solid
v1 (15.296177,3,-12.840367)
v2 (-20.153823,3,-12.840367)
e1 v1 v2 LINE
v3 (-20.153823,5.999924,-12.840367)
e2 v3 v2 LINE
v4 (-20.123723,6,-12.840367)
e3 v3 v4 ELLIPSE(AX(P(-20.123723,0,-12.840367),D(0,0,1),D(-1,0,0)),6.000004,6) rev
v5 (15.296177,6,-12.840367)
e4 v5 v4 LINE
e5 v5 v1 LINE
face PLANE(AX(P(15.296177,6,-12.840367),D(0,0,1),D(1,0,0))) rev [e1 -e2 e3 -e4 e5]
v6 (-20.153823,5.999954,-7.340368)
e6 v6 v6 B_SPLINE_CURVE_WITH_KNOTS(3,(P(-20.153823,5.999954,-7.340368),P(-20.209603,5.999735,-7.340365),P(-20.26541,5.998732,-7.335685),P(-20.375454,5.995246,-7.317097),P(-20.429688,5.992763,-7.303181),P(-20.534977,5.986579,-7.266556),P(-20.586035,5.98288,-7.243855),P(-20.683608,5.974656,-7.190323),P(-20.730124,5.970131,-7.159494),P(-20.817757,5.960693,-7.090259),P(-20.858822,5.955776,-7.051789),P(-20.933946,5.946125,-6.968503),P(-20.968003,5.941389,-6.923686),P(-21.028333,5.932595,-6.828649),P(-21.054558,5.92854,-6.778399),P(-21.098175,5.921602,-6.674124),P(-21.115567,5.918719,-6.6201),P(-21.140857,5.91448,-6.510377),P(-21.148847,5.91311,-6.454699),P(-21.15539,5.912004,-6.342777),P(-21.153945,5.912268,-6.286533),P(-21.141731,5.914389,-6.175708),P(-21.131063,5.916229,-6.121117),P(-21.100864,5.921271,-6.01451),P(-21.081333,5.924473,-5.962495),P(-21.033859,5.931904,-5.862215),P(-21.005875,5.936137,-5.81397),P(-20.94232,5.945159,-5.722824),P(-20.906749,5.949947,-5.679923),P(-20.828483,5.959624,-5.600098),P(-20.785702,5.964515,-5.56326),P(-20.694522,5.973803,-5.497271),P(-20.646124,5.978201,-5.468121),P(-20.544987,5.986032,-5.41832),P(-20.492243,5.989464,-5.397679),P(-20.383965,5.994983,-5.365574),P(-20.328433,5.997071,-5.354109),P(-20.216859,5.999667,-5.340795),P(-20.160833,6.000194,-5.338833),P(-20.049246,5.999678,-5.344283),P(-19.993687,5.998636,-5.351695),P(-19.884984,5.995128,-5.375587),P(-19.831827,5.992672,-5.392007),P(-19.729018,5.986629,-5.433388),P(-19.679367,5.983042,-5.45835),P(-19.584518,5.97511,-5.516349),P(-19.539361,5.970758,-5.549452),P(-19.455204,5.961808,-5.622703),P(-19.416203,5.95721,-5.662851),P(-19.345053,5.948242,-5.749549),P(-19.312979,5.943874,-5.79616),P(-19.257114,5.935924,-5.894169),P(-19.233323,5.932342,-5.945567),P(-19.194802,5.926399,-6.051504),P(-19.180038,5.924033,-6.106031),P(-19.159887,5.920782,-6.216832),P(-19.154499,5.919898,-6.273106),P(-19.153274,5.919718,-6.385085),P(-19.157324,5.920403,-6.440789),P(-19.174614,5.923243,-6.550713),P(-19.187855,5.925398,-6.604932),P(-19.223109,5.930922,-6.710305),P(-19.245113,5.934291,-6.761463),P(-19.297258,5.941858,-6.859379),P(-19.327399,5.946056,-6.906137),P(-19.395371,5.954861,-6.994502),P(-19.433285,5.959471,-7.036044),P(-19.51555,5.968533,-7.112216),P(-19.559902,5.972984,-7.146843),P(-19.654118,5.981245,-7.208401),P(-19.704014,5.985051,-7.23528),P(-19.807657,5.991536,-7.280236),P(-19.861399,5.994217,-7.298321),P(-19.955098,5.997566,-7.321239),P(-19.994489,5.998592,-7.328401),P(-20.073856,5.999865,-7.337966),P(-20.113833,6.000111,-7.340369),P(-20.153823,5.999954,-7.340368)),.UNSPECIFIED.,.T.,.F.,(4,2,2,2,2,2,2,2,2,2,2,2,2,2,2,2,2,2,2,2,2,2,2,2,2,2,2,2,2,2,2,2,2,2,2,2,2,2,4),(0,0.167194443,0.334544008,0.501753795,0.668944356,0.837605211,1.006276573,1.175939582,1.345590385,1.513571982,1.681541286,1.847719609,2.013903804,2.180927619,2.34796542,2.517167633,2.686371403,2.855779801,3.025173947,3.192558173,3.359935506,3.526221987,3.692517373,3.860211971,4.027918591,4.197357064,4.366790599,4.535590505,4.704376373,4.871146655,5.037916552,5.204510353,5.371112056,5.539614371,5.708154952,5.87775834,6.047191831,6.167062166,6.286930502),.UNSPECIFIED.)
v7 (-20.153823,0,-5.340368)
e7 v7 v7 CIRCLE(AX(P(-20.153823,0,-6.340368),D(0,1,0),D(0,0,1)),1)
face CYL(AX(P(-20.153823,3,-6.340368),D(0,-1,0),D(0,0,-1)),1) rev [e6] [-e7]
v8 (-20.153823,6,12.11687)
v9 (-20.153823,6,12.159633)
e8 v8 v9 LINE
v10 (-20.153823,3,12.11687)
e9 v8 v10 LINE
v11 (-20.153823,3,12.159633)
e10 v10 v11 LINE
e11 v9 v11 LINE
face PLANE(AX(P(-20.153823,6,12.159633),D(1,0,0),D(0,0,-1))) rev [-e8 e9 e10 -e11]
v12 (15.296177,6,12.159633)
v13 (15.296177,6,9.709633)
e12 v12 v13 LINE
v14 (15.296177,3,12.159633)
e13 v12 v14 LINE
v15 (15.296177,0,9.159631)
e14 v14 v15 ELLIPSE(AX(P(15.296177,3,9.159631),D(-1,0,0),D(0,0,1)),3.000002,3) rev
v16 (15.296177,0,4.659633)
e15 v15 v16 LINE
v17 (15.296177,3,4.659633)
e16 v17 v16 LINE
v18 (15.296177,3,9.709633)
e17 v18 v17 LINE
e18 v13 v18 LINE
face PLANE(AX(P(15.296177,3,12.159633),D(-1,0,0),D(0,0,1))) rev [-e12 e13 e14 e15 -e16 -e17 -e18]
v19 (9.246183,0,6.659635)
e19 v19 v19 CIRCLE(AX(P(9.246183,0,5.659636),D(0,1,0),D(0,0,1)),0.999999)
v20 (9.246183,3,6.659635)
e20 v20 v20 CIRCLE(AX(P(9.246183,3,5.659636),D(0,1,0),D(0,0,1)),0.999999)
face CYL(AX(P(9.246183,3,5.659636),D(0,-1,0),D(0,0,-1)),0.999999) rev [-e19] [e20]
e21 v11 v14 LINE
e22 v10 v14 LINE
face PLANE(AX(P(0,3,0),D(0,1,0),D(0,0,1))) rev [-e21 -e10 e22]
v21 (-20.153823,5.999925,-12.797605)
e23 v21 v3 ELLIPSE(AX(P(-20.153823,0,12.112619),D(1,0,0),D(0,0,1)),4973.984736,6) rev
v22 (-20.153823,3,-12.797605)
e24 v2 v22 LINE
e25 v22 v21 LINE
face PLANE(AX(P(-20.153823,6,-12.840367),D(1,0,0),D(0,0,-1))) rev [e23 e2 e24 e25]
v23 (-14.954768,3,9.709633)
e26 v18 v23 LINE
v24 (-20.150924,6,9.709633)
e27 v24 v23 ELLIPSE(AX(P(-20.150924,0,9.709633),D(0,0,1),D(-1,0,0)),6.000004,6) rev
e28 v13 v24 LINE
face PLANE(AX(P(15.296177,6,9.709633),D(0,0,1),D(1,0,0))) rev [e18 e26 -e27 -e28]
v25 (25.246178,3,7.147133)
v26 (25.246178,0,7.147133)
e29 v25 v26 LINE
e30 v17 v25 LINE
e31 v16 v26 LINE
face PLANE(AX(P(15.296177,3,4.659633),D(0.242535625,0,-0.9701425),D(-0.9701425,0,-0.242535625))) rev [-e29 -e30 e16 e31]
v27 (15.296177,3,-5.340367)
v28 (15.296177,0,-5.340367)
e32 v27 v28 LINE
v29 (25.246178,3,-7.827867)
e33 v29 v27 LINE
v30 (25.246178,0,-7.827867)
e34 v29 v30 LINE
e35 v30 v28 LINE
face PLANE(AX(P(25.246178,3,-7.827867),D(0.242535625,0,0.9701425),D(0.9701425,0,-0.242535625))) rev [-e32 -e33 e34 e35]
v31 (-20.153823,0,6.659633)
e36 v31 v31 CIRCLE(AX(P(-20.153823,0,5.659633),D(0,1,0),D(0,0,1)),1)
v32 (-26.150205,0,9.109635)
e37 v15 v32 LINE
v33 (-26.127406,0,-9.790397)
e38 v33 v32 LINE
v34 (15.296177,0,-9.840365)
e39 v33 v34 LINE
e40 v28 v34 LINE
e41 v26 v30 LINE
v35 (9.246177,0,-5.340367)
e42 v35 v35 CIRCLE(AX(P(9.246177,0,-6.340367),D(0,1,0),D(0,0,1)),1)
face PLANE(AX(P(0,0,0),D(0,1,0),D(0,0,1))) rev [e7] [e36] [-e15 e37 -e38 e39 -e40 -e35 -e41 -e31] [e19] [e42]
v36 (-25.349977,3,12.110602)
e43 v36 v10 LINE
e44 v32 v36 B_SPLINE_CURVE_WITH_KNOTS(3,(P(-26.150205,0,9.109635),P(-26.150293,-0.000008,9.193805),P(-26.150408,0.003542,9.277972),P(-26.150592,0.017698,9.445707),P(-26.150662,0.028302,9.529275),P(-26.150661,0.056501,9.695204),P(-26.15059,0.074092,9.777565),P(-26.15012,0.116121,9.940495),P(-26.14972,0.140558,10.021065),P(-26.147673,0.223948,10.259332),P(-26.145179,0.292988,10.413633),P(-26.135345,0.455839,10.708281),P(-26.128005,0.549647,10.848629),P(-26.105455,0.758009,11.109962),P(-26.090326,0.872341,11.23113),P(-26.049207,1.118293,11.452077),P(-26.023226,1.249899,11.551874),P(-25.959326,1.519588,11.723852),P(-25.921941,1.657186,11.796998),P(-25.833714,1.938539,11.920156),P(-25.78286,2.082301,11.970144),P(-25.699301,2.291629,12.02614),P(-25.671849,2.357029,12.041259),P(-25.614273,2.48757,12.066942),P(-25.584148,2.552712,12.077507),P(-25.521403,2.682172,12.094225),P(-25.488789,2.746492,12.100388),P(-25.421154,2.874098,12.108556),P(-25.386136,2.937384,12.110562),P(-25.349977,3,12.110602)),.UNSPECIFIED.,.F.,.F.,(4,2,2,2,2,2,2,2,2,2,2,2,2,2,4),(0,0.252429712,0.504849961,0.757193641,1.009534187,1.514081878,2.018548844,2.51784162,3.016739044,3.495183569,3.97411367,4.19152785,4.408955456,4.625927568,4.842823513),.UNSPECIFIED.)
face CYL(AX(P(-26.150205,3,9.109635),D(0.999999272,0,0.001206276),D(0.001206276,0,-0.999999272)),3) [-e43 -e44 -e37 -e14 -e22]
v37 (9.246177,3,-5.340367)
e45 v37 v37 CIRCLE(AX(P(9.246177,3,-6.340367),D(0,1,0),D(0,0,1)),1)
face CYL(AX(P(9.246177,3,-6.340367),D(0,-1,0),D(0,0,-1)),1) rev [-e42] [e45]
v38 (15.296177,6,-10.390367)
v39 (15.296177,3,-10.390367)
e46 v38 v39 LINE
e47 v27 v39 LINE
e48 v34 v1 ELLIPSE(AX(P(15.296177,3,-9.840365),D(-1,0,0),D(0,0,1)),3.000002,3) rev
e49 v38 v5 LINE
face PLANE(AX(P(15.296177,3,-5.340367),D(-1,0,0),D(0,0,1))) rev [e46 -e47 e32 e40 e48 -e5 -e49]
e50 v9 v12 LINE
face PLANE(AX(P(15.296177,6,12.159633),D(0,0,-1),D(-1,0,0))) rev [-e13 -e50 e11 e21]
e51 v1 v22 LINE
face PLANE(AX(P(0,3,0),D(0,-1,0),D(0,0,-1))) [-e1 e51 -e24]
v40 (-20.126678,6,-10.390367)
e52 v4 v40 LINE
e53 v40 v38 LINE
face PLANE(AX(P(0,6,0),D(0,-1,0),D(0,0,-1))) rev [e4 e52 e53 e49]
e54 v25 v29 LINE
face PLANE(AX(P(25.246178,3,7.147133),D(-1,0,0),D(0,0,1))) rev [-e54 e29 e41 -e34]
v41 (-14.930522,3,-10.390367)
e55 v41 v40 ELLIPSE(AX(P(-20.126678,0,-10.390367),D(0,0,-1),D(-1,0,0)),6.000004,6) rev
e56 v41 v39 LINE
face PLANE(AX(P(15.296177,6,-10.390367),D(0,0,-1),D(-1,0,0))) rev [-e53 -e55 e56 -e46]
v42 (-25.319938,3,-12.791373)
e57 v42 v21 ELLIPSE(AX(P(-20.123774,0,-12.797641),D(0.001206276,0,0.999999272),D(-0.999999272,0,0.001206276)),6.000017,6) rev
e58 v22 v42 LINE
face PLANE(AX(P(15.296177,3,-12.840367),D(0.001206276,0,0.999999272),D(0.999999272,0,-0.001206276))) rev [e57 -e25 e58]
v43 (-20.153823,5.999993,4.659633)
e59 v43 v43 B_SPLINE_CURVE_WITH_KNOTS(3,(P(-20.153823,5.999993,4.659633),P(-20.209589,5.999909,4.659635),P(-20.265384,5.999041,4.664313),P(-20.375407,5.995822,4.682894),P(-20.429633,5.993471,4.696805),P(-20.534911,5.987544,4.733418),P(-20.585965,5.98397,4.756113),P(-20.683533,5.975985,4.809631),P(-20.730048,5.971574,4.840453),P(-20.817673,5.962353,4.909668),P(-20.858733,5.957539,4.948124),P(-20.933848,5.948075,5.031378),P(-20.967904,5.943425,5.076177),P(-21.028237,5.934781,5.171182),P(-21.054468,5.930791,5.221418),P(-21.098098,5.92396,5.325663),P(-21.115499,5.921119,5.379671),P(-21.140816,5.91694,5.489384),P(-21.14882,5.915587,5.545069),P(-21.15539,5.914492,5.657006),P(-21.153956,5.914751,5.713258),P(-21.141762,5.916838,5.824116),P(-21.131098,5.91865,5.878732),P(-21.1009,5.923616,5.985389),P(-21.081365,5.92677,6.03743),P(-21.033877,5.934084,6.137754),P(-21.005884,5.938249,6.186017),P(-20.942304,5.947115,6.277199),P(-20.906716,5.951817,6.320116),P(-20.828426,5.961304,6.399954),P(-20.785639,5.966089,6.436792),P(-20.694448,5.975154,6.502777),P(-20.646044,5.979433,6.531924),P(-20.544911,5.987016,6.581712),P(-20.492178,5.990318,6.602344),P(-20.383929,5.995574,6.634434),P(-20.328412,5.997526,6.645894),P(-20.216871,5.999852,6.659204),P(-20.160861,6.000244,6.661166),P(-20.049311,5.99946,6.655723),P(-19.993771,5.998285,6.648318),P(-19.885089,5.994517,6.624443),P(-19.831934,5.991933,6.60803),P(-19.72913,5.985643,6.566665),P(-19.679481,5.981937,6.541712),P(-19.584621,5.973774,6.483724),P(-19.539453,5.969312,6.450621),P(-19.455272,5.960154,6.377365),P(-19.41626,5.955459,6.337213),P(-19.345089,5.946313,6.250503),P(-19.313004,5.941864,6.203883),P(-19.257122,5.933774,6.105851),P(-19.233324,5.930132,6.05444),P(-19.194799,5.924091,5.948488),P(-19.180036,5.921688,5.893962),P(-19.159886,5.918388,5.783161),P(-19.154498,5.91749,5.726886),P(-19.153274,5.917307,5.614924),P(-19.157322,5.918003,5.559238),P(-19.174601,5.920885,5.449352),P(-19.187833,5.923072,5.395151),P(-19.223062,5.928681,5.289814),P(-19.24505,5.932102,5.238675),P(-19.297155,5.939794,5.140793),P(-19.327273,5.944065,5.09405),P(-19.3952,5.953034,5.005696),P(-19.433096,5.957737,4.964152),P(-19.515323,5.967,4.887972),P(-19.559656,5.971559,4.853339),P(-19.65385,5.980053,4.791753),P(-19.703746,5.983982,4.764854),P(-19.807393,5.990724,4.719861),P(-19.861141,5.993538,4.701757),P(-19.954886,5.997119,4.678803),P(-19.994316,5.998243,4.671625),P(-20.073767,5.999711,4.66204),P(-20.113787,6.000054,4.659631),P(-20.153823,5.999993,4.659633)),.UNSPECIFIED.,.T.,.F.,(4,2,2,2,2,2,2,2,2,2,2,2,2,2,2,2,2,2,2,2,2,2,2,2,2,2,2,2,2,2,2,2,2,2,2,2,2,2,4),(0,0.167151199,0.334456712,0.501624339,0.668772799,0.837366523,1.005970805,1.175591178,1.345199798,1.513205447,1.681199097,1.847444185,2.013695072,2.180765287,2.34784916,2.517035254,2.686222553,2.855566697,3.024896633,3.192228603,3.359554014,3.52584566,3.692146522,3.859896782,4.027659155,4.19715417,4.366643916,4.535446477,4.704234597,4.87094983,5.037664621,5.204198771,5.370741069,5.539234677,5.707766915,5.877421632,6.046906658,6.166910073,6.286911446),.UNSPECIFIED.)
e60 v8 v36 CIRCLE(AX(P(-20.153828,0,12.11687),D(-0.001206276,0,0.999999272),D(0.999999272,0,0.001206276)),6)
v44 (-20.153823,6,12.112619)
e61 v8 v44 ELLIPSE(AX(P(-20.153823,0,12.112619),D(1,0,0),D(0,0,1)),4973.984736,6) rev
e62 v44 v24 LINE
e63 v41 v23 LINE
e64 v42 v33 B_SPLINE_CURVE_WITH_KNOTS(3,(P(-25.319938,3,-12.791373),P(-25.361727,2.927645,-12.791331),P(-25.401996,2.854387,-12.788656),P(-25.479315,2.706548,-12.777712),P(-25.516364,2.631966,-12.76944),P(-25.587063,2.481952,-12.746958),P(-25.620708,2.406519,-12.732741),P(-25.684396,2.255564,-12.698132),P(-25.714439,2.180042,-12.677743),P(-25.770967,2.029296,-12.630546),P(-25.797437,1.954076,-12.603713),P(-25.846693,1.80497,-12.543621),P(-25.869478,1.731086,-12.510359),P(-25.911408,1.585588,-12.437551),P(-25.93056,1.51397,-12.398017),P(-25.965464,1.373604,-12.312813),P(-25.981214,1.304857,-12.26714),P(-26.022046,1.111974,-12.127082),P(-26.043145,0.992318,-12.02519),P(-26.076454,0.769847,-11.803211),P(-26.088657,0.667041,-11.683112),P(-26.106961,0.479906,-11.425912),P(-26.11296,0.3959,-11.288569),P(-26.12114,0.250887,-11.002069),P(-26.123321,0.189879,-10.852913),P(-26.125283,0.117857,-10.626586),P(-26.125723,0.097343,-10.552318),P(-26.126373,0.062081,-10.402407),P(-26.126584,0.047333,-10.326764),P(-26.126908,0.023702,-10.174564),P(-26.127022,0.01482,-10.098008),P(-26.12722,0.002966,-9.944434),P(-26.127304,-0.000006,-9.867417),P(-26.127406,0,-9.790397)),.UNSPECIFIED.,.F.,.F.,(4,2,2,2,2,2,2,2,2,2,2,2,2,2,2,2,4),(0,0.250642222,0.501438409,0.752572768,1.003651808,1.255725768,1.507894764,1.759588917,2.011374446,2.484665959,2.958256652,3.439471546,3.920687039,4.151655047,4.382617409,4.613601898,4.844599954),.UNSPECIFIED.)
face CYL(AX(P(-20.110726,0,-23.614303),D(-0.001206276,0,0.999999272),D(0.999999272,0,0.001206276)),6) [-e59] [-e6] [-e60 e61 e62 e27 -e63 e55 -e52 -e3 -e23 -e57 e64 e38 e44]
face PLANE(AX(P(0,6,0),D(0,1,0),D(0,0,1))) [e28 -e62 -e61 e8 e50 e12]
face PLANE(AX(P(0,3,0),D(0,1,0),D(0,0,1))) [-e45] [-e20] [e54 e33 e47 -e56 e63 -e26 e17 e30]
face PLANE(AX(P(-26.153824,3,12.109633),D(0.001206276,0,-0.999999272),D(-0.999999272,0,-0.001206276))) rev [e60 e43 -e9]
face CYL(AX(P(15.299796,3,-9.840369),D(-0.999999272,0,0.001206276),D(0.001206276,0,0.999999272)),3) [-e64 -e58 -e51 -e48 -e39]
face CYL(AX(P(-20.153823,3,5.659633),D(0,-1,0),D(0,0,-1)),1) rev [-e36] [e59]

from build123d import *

# Parameters (mm, degrees)
CROQUIS1_R              = 0.999999899
CROQUIS1_R_2            = 0.999998866
CROQUIS1_R_3            = 1.000000014
CROQUIS1_R_4            = 0.999999985
SALIENTE_EXTRUIR1_DEPTH = 3
SALIENTE_EXTRUIR2_REACH = 38.281
CROQUIS3_W              = 35.45
CROQUIS3_H              = 2.45
SALIENTE_EXTRUIR3_DEPTH = 3
CROQUIS4_R              = 0.999999985
CROQUIS4_R_2            = 1.000000014
CORTAR_EXTRUIR1_DEPTH   = 17
CORTAR_EXTRUIR2_DEPTH   = 31
REDONDEO1_R             = 3


with BuildPart() as part:
    # Croquis1 → Saliente-Extruir1 (new body)
    with BuildSketch(Plane(origin=(0, 0, 0), x_dir=(1, 0, 0), z_dir=(0, 1, 0))):
        Polygon((25.246177886, -7.147133033), (25.246177886, 7.827867349), (15.296177123, 5.340367158), (15.296177123, 12.840367158), (-26.15382364, 12.790366967), (-26.15382364, -12.109632651), (15.296177123, -12.159632842), (15.296177123, -4.659632842), align=None)
        with Locations(Location((9.246177066, 6.34036702, 0), (0, 0, 270))):
            Circle(CROQUIS1_R, mode=Mode.SUBTRACT)
        with Locations(Location((9.246182607, -5.65963638, 0), (0, 0, 270))):
            Circle(CROQUIS1_R_2, mode=Mode.SUBTRACT)
        with Locations(Location((-20.153822905, -5.659632902, 0), (0, 0, 270))):
            Circle(CROQUIS1_R_3, mode=Mode.SUBTRACT)
        with Locations(Location((-20.15382331, 6.340367521, 0), (0, 0, 270))):
            Circle(CROQUIS1_R_4, mode=Mode.SUBTRACT)
    extrude(amount=SALIENTE_EXTRUIR1_DEPTH)

    # Saliente-Extruir2: up to this plane
    saliente_extruir2_end = Plane(origin=(15.296177123, 3, -12.840367158), z_dir=(0.0012062763193973866, 0, 0.999999272448456))
    # Croquis2 → Saliente-Extruir2 (add, up to the surface)
    with BuildSketch(Plane(origin=(-0.014645609, 0, 12.141163746), x_dir=(0.999999272448456, 0, 0.0012062763194219445), z_dir=(-0.0012062763194219447, 0, 0.999999272448456)), mode=Mode.PRIVATE) as saliente_extruir2_sk1:
        with BuildLine():
            Line((-25.335349472, 3), (-14.943044626, 3))
            ThreePointArc((-14.943044626, 3), (-20.139197049, 6), (-25.335349472, 3))
        make_face()
    saliente_extruir2_tool1 = split(extrude(saliente_extruir2_sk1.sketch, amount=-SALIENTE_EXTRUIR2_REACH, mode=Mode.PRIVATE), bisect_by=saliente_extruir2_end, keep=Keep.BOTH, mode=Mode.PRIVATE)
    add(saliente_extruir2_tool1.solids().sort_by_distance((-20.153828, 4.230121, 12.11687))[0])

    # Croquis3 → Saliente-Extruir3 (add)
    with BuildSketch(Plane(origin=(0, 3, 0), x_dir=(1, 0, 0), z_dir=(0, 1, 0))):
        with Locations((-2.428822877, -10.934632842)):
            Rectangle(CROQUIS3_W, CROQUIS3_H)
        with Locations((-2.428822877, 11.615367158)):
            Rectangle(CROQUIS3_W, CROQUIS3_H)
    extrude(amount=SALIENTE_EXTRUIR3_DEPTH)

    # Croquis4 → Cortar-Extruir1 (cut)
    with BuildSketch(Plane.XZ):
        with Locations(Location((-20.15382331, -6.340367521, 0), (0, 0, 270))):
            Circle(CROQUIS4_R)
        with Locations(Location((-20.153822905, 5.659632902, 0), (0, 0, 270))):
            Circle(CROQUIS4_R_2)
    extrude(amount=-CORTAR_EXTRUIR1_DEPTH, mode=Mode.SUBTRACT)

    # Croquis5 → Cortar-Extruir2 (cut)
    with BuildSketch(Plane(origin=(-0.014645609, 0, 12.141163746), x_dir=(0.999999272448456, 0, 0.0012062763194219445), z_dir=(-0.0012062763194219447, 0, 0.999999272448456))):
        with BuildLine():
            Line((-20.139197049, 6), (-20.139197049, 8.549534658))
            ThreePointArc((-20.139197049, 8.549534658), (-26.184630981, 6.045433933), (-28.688731707, 0))
            Line((-28.688731707, 0), (-26.139197049, 0))
            ThreePointArc((-26.139197049, 0), (-24.381837736, 4.242640687), (-20.139197049, 6))
        make_face()
    extrude(amount=-CORTAR_EXTRUIR2_DEPTH, mode=Mode.SUBTRACT)

    # Redondeo1
    redondeo1_edges = [part.edges().sort_by_distance(p)[0] for p in [
        (-5.428823259, 0, 12.134632747),
        (-5.413805086, 0, -12.815385179),
    ]]
    fillet(redondeo1_edges, radius=REDONDEO1_R - 0.0001)  # a hair under: the kernel refuses the full size


solid = part.part
